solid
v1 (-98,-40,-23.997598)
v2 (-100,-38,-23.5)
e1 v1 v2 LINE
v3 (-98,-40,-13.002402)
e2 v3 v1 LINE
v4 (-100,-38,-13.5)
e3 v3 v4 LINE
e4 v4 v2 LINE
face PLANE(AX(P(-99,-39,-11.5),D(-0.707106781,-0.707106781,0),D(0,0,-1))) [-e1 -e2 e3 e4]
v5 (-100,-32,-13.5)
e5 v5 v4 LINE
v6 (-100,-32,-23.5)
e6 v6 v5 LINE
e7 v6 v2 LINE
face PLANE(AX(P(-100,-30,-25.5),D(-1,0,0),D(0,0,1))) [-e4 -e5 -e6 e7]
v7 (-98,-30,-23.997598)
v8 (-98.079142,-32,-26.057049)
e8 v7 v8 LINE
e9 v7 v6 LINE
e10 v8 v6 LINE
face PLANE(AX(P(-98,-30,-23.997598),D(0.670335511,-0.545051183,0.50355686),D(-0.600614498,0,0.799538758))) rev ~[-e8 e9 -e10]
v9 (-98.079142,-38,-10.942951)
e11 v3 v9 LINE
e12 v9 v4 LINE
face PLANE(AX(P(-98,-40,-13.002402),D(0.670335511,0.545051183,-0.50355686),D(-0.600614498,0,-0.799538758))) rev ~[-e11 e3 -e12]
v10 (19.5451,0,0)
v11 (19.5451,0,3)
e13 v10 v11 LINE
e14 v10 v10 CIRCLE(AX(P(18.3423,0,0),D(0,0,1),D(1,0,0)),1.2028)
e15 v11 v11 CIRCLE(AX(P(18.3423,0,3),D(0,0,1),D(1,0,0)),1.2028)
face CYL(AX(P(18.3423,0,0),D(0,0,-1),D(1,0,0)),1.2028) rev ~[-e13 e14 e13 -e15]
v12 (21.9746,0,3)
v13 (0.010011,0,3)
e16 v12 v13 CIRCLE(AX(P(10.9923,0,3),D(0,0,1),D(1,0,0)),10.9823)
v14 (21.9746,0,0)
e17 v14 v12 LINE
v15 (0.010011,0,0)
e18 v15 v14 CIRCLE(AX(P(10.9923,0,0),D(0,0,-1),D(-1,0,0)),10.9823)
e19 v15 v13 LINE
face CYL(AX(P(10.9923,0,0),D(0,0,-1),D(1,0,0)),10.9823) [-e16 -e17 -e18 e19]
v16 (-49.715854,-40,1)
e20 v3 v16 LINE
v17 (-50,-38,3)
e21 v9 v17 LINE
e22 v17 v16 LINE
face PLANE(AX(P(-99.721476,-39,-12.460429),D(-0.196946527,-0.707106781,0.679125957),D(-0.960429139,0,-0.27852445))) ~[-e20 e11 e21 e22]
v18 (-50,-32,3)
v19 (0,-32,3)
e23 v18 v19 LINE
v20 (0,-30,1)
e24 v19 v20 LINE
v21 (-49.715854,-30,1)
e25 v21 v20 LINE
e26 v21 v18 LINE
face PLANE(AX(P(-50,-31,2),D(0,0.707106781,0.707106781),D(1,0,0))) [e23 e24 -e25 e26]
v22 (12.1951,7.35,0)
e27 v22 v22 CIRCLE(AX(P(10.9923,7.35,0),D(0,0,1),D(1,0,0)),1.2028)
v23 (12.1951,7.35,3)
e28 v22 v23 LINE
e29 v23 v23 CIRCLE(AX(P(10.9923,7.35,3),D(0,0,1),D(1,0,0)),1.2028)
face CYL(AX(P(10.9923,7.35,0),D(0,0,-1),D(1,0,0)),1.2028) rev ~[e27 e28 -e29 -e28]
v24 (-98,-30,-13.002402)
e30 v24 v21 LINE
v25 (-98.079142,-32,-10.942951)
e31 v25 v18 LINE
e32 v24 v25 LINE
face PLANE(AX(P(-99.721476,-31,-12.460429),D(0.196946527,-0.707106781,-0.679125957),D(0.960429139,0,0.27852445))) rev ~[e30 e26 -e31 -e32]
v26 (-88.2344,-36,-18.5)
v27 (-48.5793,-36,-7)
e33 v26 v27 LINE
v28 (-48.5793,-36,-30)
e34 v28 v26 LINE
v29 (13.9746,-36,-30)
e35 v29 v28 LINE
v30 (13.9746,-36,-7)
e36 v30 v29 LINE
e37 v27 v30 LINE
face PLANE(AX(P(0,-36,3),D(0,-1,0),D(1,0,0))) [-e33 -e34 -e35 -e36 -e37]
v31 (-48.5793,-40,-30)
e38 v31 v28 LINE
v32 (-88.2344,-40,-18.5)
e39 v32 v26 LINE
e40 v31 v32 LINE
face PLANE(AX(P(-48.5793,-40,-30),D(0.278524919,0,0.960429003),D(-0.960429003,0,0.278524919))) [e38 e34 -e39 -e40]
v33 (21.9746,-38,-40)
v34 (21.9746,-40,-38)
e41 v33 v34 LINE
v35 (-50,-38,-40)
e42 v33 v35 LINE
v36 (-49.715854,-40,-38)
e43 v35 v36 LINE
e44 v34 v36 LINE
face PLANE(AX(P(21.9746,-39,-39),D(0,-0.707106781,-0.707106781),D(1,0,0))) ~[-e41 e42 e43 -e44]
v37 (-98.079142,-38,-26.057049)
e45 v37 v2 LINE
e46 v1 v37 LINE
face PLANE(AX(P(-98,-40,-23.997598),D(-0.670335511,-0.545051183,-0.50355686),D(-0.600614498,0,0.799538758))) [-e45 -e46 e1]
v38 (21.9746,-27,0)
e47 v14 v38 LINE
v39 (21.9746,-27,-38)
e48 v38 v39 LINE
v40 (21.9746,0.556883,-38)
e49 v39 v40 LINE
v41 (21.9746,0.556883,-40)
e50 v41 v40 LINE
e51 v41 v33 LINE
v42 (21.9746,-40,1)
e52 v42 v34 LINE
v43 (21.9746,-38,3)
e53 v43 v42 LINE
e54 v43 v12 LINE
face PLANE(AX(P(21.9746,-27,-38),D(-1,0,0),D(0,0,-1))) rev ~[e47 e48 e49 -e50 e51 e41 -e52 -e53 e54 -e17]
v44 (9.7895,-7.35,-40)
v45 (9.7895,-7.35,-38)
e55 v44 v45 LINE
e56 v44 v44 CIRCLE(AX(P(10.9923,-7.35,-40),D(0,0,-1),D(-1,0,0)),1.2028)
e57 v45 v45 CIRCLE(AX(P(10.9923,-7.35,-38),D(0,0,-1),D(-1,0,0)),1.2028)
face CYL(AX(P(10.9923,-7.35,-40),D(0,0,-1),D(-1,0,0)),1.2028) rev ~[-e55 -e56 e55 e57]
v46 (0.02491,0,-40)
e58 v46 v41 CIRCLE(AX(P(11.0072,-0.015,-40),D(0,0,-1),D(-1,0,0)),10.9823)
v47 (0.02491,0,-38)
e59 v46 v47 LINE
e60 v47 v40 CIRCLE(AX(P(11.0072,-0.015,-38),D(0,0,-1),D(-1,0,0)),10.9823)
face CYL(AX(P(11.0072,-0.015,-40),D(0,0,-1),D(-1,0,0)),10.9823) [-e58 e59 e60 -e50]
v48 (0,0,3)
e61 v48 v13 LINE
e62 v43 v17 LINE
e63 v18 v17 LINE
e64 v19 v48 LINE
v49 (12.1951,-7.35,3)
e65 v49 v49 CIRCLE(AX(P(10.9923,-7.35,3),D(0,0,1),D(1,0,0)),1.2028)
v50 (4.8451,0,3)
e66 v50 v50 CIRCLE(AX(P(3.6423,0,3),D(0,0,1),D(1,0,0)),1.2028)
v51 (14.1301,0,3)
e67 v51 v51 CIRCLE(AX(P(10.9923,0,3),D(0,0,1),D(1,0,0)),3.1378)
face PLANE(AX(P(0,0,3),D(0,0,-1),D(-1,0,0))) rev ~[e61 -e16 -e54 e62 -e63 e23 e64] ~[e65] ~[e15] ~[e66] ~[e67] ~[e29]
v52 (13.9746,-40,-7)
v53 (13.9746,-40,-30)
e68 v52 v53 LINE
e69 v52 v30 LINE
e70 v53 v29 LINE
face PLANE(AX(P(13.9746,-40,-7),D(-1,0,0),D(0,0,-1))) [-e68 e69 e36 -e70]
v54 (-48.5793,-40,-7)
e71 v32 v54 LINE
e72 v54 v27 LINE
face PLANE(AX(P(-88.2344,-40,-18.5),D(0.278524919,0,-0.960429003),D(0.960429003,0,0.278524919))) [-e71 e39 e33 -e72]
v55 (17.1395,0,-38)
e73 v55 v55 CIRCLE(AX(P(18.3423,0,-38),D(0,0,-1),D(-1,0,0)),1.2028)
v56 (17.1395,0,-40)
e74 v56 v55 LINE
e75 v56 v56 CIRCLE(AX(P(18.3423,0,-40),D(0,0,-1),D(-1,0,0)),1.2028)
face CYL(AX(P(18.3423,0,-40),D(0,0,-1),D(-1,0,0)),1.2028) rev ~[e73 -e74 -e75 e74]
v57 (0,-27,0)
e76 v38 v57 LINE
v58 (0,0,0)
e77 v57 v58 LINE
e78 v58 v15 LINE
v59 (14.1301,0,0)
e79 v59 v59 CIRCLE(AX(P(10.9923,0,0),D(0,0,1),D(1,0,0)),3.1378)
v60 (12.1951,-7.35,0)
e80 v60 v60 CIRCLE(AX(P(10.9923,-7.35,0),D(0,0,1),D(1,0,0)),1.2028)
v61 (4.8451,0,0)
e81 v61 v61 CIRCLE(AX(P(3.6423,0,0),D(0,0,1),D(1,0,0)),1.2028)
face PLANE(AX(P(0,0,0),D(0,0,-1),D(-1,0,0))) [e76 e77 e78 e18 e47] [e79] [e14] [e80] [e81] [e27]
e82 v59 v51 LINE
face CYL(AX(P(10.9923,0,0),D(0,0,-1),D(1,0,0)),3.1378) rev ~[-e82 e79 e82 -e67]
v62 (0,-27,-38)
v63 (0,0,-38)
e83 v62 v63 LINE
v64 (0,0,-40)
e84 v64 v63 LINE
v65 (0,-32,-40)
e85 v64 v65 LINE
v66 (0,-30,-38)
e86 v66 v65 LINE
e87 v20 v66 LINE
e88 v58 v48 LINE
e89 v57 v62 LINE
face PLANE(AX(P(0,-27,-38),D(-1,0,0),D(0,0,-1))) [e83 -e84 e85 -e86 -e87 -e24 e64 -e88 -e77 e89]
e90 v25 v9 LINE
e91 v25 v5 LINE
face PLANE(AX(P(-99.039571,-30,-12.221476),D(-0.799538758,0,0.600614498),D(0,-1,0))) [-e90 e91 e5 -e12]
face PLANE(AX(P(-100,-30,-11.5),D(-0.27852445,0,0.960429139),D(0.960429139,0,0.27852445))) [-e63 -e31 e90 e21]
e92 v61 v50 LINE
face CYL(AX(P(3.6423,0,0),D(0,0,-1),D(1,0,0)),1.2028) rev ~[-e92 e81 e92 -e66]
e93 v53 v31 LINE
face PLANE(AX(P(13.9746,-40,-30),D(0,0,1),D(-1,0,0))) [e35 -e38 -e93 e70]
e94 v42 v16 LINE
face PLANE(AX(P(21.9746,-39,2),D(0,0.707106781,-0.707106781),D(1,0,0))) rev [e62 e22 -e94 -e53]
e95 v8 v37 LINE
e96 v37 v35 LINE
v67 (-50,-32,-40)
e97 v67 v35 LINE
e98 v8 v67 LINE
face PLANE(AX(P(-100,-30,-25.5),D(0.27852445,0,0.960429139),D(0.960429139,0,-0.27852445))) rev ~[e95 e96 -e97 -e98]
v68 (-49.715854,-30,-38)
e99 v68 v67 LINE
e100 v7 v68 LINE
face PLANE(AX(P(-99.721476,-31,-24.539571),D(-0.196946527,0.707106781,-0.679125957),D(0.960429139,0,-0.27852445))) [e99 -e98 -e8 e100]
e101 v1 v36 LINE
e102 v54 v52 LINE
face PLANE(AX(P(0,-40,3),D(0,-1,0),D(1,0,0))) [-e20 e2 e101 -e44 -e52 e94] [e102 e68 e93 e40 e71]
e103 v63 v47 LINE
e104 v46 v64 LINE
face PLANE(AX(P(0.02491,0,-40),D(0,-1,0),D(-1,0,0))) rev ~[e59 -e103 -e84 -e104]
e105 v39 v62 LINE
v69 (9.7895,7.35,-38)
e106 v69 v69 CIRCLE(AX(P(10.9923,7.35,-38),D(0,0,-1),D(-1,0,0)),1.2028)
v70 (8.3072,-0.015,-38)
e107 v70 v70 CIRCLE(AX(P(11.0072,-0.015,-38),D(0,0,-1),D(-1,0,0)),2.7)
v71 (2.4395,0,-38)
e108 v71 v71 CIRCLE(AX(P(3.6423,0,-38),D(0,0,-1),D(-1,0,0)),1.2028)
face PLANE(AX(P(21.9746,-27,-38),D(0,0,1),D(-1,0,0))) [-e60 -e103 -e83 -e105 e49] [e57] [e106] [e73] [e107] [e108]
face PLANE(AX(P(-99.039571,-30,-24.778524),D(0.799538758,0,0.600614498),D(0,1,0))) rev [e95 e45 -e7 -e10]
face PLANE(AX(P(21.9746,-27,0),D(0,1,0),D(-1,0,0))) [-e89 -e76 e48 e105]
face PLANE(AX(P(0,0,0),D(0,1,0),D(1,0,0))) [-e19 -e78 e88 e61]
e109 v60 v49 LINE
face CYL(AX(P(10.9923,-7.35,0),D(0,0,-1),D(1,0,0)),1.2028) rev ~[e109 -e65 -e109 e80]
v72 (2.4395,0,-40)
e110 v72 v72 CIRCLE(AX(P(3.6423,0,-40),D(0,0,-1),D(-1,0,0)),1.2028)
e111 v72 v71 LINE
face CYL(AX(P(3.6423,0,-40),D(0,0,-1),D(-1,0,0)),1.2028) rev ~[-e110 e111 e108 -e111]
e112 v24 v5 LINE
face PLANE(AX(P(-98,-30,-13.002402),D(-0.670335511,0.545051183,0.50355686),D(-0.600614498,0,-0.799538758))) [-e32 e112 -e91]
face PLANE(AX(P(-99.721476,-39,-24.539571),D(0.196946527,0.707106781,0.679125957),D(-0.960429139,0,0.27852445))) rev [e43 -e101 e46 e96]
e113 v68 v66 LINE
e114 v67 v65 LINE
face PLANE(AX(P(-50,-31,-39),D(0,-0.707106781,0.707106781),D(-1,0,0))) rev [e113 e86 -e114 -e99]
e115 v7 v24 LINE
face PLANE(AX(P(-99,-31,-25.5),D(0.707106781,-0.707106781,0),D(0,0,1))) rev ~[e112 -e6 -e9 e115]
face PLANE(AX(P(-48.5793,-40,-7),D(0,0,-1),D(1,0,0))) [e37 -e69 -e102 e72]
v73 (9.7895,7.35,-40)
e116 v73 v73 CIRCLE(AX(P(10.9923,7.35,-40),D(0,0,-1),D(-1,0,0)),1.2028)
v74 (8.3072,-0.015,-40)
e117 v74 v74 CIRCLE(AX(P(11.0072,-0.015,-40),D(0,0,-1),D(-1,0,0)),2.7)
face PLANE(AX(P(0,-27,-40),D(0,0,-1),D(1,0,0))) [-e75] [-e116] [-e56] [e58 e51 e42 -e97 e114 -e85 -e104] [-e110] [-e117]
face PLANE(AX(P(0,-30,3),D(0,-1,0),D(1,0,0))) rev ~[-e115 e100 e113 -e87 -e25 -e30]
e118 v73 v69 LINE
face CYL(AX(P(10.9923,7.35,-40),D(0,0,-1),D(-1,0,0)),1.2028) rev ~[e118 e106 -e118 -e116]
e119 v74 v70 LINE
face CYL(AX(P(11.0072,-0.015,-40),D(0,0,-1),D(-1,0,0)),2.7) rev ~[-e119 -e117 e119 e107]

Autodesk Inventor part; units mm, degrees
ref_plane "YZ Plane" through (0, 0, 0) normal (1, 0, 0) x (0, 1, 0)
ref_plane "XZ Plane" through (0, 0, 0) normal (0, 1, 0) x (-1, 0, 0)
ref_plane "XY Plane" through (0, 0, 0) normal (0, 0, 1) x (1, 0, 0)
ref_plane "Plano de trabajo1" through (0, 0, 0) normal (0, 0, 1) x (1, 0, 0)
sketch "Boceto1" plane through (0, 0, 0) normal (0, 0, 1) x (1, 0, 0)
  circle A0 centre (10.9923, 0) radius 10.9823 projected
  circle A1 centre (10.9923, 0) radius 3.1378 projected
  circle A2 centre (18.3423, 0) radius 1.2028 projected
  circle A3 centre (10.9923, 7.35) radius 1.2028 projected
  circle A4 centre (3.6423, 0) radius 1.2028 projected
  circle A5 centre (10.9923, -7.35) radius 1.2028 projected
  line L0 (0, 0) -> (0, 30)
  line L1 (21.9746, 0) -> (21.9746, -30)
  line L2 (0, 0) -> (0, -30)
  line L3 (0, -30) -> (21.9746, -30)
  circle A6 centre (10.9923, 0) radius 3.1378
  circle A7 centre (18.3423, 0) radius 1.2028
  circle A8 centre (10.9923, -7.35) radius 1.2028
  circle A9 centre (3.6423, 0) radius 1.2028
  circle A10 centre (10.9923, 7.35) radius 1.2028
  circle A11 centre (10.9923, 0) radius 10.9823
  line L4 (0, 0) -> (0, -30)
  line L5 (0, -30) -> (21.9746, -30)
  line L6 (21.9746, -30) -> (21.9746, 0)
  dimension "d0" = 30
  dimension "d1" = 30
extrude "Extrusión1" add sketch "Boceto1" along normal blind 3
sketch "Boceto2" plane through (10.9923, 0, 3) normal (0, 0, 1) x (1, 0, 0)
  circle A0 centre (0, 0) radius 10.9823 projected
  line L0 (10.9823, 0) -> (10.9823, -30)
  line L1 (10.9823, -30) -> (-9.7118, -30)
  line L2 (-9.7118, -30) -> (-10.9923, 0)
  circle A1 centre (0, 0) radius 10.9823 projected
  circle A2 centre (0, -7.35) radius 1.2028 projected
  circle A3 centre (-7.35, 0) radius 1.2028 projected
  circle A4 centre (0, 7.35) radius 1.2028 projected
  circle A5 centre (7.35, 0) radius 1.2028 projected
  circle A6 centre (0, 0) radius 3.1378 projected
  point P0 (-10.9723, -0.4683)
  dimension "d4" = 30
extrude "Extrusión2" add sketch "Boceto2" against normal blind 3 contours L0 L1 L2 A0
sketch "Boceto3" plane through (0, 0, 0) normal (0, 0, -1) x (-1, 0, 0)
  point P0 (0, 0)
sketch "Boceto4" plane through (0, 0, 3) normal (0, 0, 1) x (1, 0, 0)
  point P0 (0, 0)
sketch "Boceto5" plane through (0, 0, 0) normal (0, 0, -1) x (-1, 0, 0)
  arc A0 (-0.02, -0.4683) -> (-21.9746, 0) centre (-10.9923, 0) ccw projected
  line L0 (-21.9746, 0) -> (-21.9746, -30) projected
  line L1 (-21.9746, -30) -> (-1.2805, -30) projected
  line L2 (-1.2805, -30) -> (-0.02, -0.4683) projected
  circle A1 centre (-10.9923, -7.35) radius 1.2028 projected
  circle A2 centre (-3.6423, 0) radius 1.2028 projected
  circle A3 centre (-10.9923, 7.35) radius 1.2028 projected
  circle A4 centre (-18.3423, 0) radius 1.2028 projected
  circle A5 centre (-10.9923, 0) radius 3.1378 projected
  line L3 (-21.9746, -30) -> (0, -30)
  line L4 (0, -30) -> (0, 0)
  line L5 (0, 0) -> (-21.9746, 0)
  line L6 (-21.9746, 0) -> (-21.9746, -30)
  point P0 (-0.01, 0)
extrude "Extrusión3" add sketch "Boceto5" against normal blind 3 contours A0 L5 L4 L3 L2
sketch "Boceto6" plane through (0, 0, 0) normal (0, 0, -1) x (-1, 0, 0)
  point P0 (0, 0)
sketch "Boceto7" plane through (0, 0, 0) normal (0, 0, -1) x (-1, 0, 0)
  line L0 (-21.9746, -30) -> (0, -30) projected
  line L1 (-21.9746, -30) -> (-21.9746, 0) projected
  line L2 (0, -30) -> (-21.9746, -30)
  line L3 (-21.9746, -30) -> (-21.9746, -27)
  line L4 (-21.9746, -27) -> (0, -27)
  line L5 (0, -27) -> (0, -30)
  point P0 (0, 0)
  dimension "d9" = 3
extrude "Extrusión4" add sketch "Boceto7" along normal blind 40
sketch "Boceto8" plane through (0, -27, 0) normal (0, 1, 0) x (1, 0, 0)
  line L0 (0, -3) -> (0, 40) projected
  line L1 (21.9746, -3) -> (21.9746, 40) projected
  line L2 (0, 40) -> (21.9746, 40)
  line L3 (21.9746, 40) -> (21.9746, 38)
  line L4 (21.9746, 38) -> (0, 38)
  line L5 (0, 38) -> (0, 40)
  point P0 (0, 0)
  point P1 (21.9746, 40)
  point P2 (0, 38)
  dimension "d12" = 2
extrude "Extrusión5" add sketch "Boceto8" along normal blind 40
sketch "Boceto9" plane through (0, 0, -40) normal (0, 0, -1) x (-1, 0, 0)
  circle A0 centre (-11.0072, -0.015) radius 2.7 projected
  circle A1 centre (-11.0072, -0.015) radius 10.9823 projected
  circle A2 centre (-18.3423, 0) radius 1.2028 projected
  circle A3 centre (-10.9923, -7.35) radius 1.2028 projected
  circle A4 centre (-10.9923, 7.35) radius 1.2028 projected
  circle A5 centre (-3.6423, 0) radius 1.2028 projected
  line L0 (-21.9746, -30) -> (-21.9746, 13) projected
  line L1 (-21.9746, -30) -> (0, -30) projected
  line L2 (0, -30) -> (0, 13) projected
  line L3 (-21.9746, 13) -> (0, 13) projected
  line L4 (-21.5706, 0) -> (-25.972, 0)
  line L5 (-25.972, 0) -> (-25.972, 18.1609)
  line L6 (-25.972, 18.1609) -> (4.5124, 18.1609)
  line L7 (4.5124, 18.1609) -> (4.5124, 1.2028)
  line L8 (4.5124, 1.2028) -> (4.5124, 0)
  line L9 (-3.6423, 0) -> (4.822, 0)
  point P0 (0, 0)
  point P1 (-21.9746, 0.557)
  point P2 (-0.0249, 0)
  point P3 (0, 0)
extrude "Extrusión6" cut sketch "Boceto9" against normal blind 40 contours A0 | A1 L0 L3 L2 L9 | A2 | A3 | A4 | A5
sketch "Boceto10" plane through (0, -30, 3) normal (0, -1, 0) x (1, 0, 0)
  point P0 (0, -3)
sketch "Boceto11" plane through (0, -30, 3) normal (0, -1, 0) x (1, 0, 0)
  line L0 (0.0249, -43) -> (21.9746, -43) projected
  line L1 (0, -3) -> (0, 0) projected
  line L2 (21.9746, -43) -> (0, -43)
  line L3 (0, -43) -> (0, 0)
  line L4 (0, 0) -> (21.9746, 0)
  line L5 (21.9746, 0) -> (21.9746, -43)
  line L6 (0, -43) -> (-100, -43)
  line L7 (-100, -43) -> (-100, 0)
  line L8 (-100, 0) -> (0, 0)
  line L9 (0, 0) -> (0, -43)
  line L10 (-100, 0) -> (-100, -21.5)
  line L11 (-100, -21.5) -> (-100, -14.5)
  line L12 (-100, -14.5) -> (-100, -28.5)
  line L13 (-100, -28.5) -> (-50, -43)
  line L14 (-50, -43) -> (-50, 0)
  line L15 (-100, -14.5) -> (-50, 0)
  dimension "d17" = 100
  dimension "d18" = 21.5
  dimension "d19" = 7
  dimension "d20" = 14
extrude "Extrusión7" add sketch "Boceto11" along normal blind 10 contours L2 L3 L1 L4 L5 L0 | L6 L14 L8 L1 L3 | L13 L7 L15 L14
chamfer "Chaflán1" distance 2 angle 45 12 edges at (-14.0127, -40, -40) (-75, -40, -32.75) (-75, -30, -32.75) (-25, -30, -40) (-14.0127, -40, 3) (-75, -40, -4.25) (-100, -40, -18.5) (-75, -30, -4.25) (-25, -30, 3) (-100, -30, -18.5) (-100, -35, -25.5) (-100, -35, -11.5)
sketch "Boceto12" plane through (0, -40, 3) normal (0, -1, 0) x (1, 0, 0)
  line L0 (-49.7159, -2) -> (21.9746, -2) projected
  line L1 (-98, -16.0024) -> (-49.7159, -2) projected
  line L2 (-98, -26.9976) -> (-98, -16.0024) projected
  line L3 (-49.7159, -41) -> (-98, -26.9976) projected
  line L4 (21.9746, -41) -> (-49.7159, -41) projected
  line L5 (21.9746, -41) -> (21.9746, -2) projected
  line L6 (-48.5793, -33) -> (-88.2344, -21.5)
  line L7 (-88.2344, -21.5) -> (-48.5793, -10)
  line L8 (-48.5793, -10) -> (13.9746, -10)
  line L9 (13.9746, -10) -> (13.9746, -33)
  line L10 (13.9746, -33) -> (-48.5793, -33)
  point P0 (0, -3)
  dimension "d26" = 8
extrude "Extrusión8" cut sketch "Boceto12" against normal blind 4 contours L6 L7 L8 L9 L10
properties part number "tibia"
